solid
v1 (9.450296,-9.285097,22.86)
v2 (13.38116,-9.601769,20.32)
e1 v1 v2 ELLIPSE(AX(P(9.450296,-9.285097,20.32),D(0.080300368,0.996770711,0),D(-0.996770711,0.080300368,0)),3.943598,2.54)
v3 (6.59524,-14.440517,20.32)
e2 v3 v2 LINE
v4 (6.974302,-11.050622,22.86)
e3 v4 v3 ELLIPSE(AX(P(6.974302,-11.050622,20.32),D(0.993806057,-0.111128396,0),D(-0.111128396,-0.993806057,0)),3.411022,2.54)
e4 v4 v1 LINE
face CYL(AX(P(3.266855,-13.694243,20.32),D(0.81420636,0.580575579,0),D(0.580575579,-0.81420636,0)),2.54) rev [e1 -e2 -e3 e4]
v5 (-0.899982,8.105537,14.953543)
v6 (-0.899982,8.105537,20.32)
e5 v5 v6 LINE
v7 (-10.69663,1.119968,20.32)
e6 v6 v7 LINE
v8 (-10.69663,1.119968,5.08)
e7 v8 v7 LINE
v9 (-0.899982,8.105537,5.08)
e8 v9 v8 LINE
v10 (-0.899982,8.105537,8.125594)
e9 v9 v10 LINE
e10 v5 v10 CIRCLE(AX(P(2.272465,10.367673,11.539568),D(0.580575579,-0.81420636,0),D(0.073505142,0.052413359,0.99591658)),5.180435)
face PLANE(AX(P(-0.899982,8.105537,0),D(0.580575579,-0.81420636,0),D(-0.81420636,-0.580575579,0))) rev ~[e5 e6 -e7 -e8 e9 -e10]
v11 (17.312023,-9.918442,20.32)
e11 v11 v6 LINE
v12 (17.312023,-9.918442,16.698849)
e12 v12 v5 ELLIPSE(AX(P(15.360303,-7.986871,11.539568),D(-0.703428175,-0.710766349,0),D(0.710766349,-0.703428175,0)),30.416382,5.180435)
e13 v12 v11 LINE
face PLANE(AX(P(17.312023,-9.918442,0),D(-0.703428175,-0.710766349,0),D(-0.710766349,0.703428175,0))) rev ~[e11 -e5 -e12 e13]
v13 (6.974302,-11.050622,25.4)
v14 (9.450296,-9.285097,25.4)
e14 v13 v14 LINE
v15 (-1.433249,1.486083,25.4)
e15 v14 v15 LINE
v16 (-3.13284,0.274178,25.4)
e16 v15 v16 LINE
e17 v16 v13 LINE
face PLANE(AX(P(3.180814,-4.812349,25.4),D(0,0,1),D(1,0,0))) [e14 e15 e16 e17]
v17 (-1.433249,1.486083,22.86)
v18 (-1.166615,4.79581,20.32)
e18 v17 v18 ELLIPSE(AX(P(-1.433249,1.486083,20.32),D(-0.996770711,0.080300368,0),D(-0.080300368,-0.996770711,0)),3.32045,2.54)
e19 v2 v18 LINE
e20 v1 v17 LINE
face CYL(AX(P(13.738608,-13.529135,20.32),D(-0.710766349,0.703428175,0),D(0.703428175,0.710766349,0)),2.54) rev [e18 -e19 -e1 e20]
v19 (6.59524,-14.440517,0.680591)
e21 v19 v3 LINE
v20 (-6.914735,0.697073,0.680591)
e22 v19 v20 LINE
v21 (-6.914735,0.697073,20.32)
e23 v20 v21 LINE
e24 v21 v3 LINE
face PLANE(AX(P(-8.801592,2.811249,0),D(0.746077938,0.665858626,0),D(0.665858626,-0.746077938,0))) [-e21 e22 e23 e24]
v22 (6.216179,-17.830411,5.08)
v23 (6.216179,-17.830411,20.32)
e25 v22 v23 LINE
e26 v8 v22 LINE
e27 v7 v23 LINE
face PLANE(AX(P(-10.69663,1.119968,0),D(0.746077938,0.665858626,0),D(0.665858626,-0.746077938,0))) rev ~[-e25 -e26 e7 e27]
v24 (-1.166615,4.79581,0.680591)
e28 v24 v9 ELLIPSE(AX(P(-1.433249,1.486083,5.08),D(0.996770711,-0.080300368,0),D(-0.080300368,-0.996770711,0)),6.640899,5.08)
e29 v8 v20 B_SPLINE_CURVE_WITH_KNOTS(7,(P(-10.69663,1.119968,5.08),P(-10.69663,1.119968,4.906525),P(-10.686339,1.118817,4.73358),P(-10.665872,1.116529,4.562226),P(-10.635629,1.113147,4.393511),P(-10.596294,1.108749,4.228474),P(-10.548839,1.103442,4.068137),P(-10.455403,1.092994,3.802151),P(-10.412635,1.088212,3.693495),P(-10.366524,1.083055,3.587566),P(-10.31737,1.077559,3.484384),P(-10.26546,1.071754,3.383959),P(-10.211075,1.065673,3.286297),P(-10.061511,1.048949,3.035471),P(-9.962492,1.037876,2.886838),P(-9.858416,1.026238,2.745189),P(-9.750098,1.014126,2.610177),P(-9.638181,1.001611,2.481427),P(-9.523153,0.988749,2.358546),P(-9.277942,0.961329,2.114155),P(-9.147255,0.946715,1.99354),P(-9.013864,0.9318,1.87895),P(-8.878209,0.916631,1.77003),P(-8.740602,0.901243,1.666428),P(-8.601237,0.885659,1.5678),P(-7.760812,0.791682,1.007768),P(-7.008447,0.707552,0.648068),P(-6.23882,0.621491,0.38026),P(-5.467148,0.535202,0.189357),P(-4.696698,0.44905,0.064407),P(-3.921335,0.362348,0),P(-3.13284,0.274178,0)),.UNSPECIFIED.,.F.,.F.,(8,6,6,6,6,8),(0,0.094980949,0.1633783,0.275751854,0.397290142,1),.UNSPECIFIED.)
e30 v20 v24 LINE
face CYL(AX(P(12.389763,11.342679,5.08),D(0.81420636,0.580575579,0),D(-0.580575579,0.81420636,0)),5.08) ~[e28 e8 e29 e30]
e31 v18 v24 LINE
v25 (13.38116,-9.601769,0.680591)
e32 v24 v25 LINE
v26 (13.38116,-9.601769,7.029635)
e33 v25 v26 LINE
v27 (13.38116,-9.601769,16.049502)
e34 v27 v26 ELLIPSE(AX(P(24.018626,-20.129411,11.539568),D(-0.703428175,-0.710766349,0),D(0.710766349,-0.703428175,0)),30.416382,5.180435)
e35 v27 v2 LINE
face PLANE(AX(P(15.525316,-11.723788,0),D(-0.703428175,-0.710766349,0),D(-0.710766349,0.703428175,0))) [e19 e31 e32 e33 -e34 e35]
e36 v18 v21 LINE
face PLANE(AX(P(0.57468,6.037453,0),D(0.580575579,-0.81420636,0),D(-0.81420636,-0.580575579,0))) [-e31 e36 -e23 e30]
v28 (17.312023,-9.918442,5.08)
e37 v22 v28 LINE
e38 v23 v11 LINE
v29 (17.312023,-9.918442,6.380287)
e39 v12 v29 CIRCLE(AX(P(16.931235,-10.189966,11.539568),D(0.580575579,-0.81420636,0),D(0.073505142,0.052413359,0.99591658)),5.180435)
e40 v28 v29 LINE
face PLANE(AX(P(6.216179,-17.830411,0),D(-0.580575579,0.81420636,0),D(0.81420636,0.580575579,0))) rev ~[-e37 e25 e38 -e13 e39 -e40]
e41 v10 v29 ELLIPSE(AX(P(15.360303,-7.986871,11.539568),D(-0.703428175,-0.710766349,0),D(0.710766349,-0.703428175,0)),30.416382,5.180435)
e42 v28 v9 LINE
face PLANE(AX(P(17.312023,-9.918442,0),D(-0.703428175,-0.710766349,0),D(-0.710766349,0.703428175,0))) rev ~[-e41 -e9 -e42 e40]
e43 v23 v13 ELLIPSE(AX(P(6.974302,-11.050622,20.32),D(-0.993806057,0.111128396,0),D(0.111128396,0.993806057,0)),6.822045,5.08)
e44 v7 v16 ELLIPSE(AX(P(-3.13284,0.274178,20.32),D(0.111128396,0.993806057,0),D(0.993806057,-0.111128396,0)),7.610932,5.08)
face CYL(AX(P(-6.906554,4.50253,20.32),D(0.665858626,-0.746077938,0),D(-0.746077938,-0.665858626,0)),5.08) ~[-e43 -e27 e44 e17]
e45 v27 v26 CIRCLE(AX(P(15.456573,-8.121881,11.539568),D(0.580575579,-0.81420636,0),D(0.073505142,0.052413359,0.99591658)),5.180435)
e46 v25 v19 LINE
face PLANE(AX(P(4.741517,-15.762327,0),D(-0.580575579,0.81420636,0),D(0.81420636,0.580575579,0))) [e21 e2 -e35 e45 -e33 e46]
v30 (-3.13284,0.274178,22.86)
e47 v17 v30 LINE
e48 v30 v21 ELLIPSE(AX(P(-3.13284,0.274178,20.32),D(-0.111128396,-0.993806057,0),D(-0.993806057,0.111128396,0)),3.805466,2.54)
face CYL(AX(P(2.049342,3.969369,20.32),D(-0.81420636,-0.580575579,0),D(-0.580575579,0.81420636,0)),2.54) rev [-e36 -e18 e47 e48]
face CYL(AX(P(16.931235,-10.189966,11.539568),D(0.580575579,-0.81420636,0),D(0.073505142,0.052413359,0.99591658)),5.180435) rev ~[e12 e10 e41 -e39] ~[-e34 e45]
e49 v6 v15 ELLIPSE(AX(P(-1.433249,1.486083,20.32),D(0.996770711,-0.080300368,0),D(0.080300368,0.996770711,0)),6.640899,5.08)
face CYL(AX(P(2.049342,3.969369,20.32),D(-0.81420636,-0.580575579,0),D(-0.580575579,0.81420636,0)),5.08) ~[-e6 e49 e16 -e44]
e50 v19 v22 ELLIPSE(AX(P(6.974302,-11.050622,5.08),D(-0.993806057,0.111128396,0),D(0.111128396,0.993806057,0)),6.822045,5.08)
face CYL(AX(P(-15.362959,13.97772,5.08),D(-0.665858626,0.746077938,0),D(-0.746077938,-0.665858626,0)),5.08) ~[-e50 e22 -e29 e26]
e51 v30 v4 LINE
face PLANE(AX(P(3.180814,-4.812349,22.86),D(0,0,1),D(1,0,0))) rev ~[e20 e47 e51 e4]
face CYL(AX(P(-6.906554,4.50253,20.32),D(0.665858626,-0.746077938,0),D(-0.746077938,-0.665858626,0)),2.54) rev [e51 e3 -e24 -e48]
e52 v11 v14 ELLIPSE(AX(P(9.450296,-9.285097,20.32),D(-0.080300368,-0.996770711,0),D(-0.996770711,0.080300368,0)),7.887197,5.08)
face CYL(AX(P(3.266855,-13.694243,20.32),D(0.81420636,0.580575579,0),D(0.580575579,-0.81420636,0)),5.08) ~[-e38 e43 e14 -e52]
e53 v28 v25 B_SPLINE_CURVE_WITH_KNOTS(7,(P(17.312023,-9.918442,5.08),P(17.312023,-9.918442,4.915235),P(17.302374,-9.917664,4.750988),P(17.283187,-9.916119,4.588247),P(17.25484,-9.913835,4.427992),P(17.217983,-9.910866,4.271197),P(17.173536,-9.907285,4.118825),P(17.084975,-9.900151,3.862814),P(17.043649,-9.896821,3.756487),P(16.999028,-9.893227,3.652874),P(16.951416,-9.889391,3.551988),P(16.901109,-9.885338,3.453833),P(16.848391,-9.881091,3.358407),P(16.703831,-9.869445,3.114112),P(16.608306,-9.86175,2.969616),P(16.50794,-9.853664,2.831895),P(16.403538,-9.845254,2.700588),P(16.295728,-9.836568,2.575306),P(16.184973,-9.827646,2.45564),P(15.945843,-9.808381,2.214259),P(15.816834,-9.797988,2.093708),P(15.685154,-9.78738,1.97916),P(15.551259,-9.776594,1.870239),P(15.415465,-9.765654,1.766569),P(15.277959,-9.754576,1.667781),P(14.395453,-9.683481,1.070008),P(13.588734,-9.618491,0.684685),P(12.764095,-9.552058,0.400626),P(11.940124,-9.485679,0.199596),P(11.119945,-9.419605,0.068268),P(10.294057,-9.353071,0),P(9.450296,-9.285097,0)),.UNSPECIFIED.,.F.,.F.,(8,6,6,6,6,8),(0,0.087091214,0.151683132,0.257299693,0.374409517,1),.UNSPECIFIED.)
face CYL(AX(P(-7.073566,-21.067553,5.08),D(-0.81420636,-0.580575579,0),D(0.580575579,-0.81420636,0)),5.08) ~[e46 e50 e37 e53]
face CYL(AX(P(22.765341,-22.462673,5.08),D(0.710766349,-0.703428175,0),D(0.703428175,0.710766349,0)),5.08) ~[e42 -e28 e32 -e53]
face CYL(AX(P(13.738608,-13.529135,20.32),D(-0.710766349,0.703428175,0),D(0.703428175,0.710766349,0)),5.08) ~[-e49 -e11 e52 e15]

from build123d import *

# Parameters (mm, degrees)
F1_DEPTH    = 25.4
F2_R        = 5.08
F3_T        = -2.54
F4_T1_DEPTH = 50.8
F4_T3_DEPTH = 39.0278032796
F4_T5_DEPTH = 51.0230548821
F4_T7_DEPTH = 37.4321438382
F6_DEPTH    = 105.664


# Not quite as in the source:
# - a fillet or chamfer that OpenCascade refuses, or shapes differently, is made with other operations: its cross-section is extruded or revolved along the edge and cut away or added


with BuildPart() as f1:
    # F0 (on Top) → F1 (new body)
    with BuildSketch(Plane.XY):
        Polygon((-0.8999820115, 8.1055370808), (-10.6966300514, 1.1199682045), (6.2161790492, -17.8304114309), (17.312023155, -9.9184416504), align=None)
    extrude(amount=F1_DEPTH)

    # F2
    f2_edges = [f1.edges().sort_by_distance(p)[0] for p in [
        (8.206021, -0.906452, 25.4),
        (11.764101, -13.874427, 25.4),
        (-2.240226, -8.355222, 25.4),
        (-5.798306, 4.612753, 25.4),
    ]]
    fillet(f2_edges, radius=F2_R)

    # F3
    f3_openings = [f1.faces().sort_by_distance(p)[0] for p in [
        (3.164917, -4.822441, 0),
    ]]
    offset(amount=F3_T, openings=f3_openings)

    # F4: fillet of radius 5.08 on 4 edges, made by hand

    # F4_s2 → F4_t1 (cut)
    with BuildSketch(Plane(origin=(-13.7553254463, 15.4124981643, 0), x_dir=(0, 0, 1), z_dir=(0.665858626, -0.7460779384, 0))):
        with BuildLine():
            ThreePointArc((5.08, 7.2347792067), (1.4878975516, 5.7468816552), (0, 2.1547792067))
            Line((0, 2.1547792067), (0, 7.2347792067))
            Line((0, 7.2347792067), (5.08, 7.2347792067))
        make_face()
    extrude(amount=F4_T1_DEPTH, mode=Mode.SUBTRACT)

    # F4_s4 → F4_t3 (cut)
    with BuildSketch(Plane(origin=(-14.6481007776, -10.4449314165, 0), x_dir=(0, 0, 1), z_dir=(0.8142063602, 0.5805755791, 0))):
        with BuildLine():
            ThreePointArc((5.08, 18.1265961431), (1.4878975516, 16.6386985916), (0, 13.0465961431))
            Line((0, 13.0465961431), (0, 18.1265961431))
            Line((0, 18.1265961431), (5.08, 18.1265961431))
        make_face()
    extrude(amount=F4_T3_DEPTH, mode=Mode.SUBTRACT)

    # F4_s6 → F4_t5 (cut)
    with BuildSketch(Plane(origin=(22.7315266592, -22.496839271, 0), x_dir=(0, 0, 1), z_dir=(-0.7107663489, 0.7034281749, 0))):
        with BuildLine():
            ThreePointArc((5.08, 5.1280702931), (1.4878975516, 3.6401727415), (0, 0.0480702931))
            Line((0, 0.0480702931), (0, 5.1280702931))
            Line((0, 5.1280702931), (5.08, 5.1280702931))
        make_face()
    extrude(amount=F4_T5_DEPTH, mode=Mode.SUBTRACT)

    # F4_s8 → F4_t7 (cut)
    with BuildSketch(Plane(origin=(13.575348792, 9.6799980584, 0), x_dir=(0, 0, 1), z_dir=(-0.8142063602, -0.5805755791, 0))):
        with BuildLine():
            ThreePointArc((5.08, 7.1220874215), (1.4878975516, 5.6341898699), (0, 2.0420874215))
            Line((0, 2.0420874215), (0, 7.1220874215))
            Line((0, 7.1220874215), (5.08, 7.1220874215))
        make_face()
    extrude(amount=F4_T7_DEPTH, mode=Mode.SUBTRACT)

    # F5 (on face) → F6 (cut)
    with BuildSketch(Plane(origin=(10.5238590523, -14.7587898685, 0), x_dir=(0.8142063602, 0.5805755791, 0), z_dir=(0.5805755791, -0.8142063602, 0))):
        with BuildLine():
            Line((8.3371543562, 6.3802872405), (8.3371543562, 16.698849146))
            ThreePointArc((8.3371543562, 16.698849146), (2.6890388134, 11.5395681933), (8.3371543562, 6.3802872405))
        make_face()
        with BuildLine():
            ThreePointArc((8.3371543562, 6.3802872405), (11.6943719949, 8.0457081644), (13.0499085036, 11.5395681933))
            ThreePointArc((13.0499085036, 11.5395681933), (11.6943719949, 15.0334282221), (8.3371543562, 16.698849146))
            Line((8.3371543562, 16.698849146), (8.3371543562, 6.3802872405))
        make_face()
    extrude(amount=-F6_DEPTH, mode=Mode.SUBTRACT)


solid = f1.part
